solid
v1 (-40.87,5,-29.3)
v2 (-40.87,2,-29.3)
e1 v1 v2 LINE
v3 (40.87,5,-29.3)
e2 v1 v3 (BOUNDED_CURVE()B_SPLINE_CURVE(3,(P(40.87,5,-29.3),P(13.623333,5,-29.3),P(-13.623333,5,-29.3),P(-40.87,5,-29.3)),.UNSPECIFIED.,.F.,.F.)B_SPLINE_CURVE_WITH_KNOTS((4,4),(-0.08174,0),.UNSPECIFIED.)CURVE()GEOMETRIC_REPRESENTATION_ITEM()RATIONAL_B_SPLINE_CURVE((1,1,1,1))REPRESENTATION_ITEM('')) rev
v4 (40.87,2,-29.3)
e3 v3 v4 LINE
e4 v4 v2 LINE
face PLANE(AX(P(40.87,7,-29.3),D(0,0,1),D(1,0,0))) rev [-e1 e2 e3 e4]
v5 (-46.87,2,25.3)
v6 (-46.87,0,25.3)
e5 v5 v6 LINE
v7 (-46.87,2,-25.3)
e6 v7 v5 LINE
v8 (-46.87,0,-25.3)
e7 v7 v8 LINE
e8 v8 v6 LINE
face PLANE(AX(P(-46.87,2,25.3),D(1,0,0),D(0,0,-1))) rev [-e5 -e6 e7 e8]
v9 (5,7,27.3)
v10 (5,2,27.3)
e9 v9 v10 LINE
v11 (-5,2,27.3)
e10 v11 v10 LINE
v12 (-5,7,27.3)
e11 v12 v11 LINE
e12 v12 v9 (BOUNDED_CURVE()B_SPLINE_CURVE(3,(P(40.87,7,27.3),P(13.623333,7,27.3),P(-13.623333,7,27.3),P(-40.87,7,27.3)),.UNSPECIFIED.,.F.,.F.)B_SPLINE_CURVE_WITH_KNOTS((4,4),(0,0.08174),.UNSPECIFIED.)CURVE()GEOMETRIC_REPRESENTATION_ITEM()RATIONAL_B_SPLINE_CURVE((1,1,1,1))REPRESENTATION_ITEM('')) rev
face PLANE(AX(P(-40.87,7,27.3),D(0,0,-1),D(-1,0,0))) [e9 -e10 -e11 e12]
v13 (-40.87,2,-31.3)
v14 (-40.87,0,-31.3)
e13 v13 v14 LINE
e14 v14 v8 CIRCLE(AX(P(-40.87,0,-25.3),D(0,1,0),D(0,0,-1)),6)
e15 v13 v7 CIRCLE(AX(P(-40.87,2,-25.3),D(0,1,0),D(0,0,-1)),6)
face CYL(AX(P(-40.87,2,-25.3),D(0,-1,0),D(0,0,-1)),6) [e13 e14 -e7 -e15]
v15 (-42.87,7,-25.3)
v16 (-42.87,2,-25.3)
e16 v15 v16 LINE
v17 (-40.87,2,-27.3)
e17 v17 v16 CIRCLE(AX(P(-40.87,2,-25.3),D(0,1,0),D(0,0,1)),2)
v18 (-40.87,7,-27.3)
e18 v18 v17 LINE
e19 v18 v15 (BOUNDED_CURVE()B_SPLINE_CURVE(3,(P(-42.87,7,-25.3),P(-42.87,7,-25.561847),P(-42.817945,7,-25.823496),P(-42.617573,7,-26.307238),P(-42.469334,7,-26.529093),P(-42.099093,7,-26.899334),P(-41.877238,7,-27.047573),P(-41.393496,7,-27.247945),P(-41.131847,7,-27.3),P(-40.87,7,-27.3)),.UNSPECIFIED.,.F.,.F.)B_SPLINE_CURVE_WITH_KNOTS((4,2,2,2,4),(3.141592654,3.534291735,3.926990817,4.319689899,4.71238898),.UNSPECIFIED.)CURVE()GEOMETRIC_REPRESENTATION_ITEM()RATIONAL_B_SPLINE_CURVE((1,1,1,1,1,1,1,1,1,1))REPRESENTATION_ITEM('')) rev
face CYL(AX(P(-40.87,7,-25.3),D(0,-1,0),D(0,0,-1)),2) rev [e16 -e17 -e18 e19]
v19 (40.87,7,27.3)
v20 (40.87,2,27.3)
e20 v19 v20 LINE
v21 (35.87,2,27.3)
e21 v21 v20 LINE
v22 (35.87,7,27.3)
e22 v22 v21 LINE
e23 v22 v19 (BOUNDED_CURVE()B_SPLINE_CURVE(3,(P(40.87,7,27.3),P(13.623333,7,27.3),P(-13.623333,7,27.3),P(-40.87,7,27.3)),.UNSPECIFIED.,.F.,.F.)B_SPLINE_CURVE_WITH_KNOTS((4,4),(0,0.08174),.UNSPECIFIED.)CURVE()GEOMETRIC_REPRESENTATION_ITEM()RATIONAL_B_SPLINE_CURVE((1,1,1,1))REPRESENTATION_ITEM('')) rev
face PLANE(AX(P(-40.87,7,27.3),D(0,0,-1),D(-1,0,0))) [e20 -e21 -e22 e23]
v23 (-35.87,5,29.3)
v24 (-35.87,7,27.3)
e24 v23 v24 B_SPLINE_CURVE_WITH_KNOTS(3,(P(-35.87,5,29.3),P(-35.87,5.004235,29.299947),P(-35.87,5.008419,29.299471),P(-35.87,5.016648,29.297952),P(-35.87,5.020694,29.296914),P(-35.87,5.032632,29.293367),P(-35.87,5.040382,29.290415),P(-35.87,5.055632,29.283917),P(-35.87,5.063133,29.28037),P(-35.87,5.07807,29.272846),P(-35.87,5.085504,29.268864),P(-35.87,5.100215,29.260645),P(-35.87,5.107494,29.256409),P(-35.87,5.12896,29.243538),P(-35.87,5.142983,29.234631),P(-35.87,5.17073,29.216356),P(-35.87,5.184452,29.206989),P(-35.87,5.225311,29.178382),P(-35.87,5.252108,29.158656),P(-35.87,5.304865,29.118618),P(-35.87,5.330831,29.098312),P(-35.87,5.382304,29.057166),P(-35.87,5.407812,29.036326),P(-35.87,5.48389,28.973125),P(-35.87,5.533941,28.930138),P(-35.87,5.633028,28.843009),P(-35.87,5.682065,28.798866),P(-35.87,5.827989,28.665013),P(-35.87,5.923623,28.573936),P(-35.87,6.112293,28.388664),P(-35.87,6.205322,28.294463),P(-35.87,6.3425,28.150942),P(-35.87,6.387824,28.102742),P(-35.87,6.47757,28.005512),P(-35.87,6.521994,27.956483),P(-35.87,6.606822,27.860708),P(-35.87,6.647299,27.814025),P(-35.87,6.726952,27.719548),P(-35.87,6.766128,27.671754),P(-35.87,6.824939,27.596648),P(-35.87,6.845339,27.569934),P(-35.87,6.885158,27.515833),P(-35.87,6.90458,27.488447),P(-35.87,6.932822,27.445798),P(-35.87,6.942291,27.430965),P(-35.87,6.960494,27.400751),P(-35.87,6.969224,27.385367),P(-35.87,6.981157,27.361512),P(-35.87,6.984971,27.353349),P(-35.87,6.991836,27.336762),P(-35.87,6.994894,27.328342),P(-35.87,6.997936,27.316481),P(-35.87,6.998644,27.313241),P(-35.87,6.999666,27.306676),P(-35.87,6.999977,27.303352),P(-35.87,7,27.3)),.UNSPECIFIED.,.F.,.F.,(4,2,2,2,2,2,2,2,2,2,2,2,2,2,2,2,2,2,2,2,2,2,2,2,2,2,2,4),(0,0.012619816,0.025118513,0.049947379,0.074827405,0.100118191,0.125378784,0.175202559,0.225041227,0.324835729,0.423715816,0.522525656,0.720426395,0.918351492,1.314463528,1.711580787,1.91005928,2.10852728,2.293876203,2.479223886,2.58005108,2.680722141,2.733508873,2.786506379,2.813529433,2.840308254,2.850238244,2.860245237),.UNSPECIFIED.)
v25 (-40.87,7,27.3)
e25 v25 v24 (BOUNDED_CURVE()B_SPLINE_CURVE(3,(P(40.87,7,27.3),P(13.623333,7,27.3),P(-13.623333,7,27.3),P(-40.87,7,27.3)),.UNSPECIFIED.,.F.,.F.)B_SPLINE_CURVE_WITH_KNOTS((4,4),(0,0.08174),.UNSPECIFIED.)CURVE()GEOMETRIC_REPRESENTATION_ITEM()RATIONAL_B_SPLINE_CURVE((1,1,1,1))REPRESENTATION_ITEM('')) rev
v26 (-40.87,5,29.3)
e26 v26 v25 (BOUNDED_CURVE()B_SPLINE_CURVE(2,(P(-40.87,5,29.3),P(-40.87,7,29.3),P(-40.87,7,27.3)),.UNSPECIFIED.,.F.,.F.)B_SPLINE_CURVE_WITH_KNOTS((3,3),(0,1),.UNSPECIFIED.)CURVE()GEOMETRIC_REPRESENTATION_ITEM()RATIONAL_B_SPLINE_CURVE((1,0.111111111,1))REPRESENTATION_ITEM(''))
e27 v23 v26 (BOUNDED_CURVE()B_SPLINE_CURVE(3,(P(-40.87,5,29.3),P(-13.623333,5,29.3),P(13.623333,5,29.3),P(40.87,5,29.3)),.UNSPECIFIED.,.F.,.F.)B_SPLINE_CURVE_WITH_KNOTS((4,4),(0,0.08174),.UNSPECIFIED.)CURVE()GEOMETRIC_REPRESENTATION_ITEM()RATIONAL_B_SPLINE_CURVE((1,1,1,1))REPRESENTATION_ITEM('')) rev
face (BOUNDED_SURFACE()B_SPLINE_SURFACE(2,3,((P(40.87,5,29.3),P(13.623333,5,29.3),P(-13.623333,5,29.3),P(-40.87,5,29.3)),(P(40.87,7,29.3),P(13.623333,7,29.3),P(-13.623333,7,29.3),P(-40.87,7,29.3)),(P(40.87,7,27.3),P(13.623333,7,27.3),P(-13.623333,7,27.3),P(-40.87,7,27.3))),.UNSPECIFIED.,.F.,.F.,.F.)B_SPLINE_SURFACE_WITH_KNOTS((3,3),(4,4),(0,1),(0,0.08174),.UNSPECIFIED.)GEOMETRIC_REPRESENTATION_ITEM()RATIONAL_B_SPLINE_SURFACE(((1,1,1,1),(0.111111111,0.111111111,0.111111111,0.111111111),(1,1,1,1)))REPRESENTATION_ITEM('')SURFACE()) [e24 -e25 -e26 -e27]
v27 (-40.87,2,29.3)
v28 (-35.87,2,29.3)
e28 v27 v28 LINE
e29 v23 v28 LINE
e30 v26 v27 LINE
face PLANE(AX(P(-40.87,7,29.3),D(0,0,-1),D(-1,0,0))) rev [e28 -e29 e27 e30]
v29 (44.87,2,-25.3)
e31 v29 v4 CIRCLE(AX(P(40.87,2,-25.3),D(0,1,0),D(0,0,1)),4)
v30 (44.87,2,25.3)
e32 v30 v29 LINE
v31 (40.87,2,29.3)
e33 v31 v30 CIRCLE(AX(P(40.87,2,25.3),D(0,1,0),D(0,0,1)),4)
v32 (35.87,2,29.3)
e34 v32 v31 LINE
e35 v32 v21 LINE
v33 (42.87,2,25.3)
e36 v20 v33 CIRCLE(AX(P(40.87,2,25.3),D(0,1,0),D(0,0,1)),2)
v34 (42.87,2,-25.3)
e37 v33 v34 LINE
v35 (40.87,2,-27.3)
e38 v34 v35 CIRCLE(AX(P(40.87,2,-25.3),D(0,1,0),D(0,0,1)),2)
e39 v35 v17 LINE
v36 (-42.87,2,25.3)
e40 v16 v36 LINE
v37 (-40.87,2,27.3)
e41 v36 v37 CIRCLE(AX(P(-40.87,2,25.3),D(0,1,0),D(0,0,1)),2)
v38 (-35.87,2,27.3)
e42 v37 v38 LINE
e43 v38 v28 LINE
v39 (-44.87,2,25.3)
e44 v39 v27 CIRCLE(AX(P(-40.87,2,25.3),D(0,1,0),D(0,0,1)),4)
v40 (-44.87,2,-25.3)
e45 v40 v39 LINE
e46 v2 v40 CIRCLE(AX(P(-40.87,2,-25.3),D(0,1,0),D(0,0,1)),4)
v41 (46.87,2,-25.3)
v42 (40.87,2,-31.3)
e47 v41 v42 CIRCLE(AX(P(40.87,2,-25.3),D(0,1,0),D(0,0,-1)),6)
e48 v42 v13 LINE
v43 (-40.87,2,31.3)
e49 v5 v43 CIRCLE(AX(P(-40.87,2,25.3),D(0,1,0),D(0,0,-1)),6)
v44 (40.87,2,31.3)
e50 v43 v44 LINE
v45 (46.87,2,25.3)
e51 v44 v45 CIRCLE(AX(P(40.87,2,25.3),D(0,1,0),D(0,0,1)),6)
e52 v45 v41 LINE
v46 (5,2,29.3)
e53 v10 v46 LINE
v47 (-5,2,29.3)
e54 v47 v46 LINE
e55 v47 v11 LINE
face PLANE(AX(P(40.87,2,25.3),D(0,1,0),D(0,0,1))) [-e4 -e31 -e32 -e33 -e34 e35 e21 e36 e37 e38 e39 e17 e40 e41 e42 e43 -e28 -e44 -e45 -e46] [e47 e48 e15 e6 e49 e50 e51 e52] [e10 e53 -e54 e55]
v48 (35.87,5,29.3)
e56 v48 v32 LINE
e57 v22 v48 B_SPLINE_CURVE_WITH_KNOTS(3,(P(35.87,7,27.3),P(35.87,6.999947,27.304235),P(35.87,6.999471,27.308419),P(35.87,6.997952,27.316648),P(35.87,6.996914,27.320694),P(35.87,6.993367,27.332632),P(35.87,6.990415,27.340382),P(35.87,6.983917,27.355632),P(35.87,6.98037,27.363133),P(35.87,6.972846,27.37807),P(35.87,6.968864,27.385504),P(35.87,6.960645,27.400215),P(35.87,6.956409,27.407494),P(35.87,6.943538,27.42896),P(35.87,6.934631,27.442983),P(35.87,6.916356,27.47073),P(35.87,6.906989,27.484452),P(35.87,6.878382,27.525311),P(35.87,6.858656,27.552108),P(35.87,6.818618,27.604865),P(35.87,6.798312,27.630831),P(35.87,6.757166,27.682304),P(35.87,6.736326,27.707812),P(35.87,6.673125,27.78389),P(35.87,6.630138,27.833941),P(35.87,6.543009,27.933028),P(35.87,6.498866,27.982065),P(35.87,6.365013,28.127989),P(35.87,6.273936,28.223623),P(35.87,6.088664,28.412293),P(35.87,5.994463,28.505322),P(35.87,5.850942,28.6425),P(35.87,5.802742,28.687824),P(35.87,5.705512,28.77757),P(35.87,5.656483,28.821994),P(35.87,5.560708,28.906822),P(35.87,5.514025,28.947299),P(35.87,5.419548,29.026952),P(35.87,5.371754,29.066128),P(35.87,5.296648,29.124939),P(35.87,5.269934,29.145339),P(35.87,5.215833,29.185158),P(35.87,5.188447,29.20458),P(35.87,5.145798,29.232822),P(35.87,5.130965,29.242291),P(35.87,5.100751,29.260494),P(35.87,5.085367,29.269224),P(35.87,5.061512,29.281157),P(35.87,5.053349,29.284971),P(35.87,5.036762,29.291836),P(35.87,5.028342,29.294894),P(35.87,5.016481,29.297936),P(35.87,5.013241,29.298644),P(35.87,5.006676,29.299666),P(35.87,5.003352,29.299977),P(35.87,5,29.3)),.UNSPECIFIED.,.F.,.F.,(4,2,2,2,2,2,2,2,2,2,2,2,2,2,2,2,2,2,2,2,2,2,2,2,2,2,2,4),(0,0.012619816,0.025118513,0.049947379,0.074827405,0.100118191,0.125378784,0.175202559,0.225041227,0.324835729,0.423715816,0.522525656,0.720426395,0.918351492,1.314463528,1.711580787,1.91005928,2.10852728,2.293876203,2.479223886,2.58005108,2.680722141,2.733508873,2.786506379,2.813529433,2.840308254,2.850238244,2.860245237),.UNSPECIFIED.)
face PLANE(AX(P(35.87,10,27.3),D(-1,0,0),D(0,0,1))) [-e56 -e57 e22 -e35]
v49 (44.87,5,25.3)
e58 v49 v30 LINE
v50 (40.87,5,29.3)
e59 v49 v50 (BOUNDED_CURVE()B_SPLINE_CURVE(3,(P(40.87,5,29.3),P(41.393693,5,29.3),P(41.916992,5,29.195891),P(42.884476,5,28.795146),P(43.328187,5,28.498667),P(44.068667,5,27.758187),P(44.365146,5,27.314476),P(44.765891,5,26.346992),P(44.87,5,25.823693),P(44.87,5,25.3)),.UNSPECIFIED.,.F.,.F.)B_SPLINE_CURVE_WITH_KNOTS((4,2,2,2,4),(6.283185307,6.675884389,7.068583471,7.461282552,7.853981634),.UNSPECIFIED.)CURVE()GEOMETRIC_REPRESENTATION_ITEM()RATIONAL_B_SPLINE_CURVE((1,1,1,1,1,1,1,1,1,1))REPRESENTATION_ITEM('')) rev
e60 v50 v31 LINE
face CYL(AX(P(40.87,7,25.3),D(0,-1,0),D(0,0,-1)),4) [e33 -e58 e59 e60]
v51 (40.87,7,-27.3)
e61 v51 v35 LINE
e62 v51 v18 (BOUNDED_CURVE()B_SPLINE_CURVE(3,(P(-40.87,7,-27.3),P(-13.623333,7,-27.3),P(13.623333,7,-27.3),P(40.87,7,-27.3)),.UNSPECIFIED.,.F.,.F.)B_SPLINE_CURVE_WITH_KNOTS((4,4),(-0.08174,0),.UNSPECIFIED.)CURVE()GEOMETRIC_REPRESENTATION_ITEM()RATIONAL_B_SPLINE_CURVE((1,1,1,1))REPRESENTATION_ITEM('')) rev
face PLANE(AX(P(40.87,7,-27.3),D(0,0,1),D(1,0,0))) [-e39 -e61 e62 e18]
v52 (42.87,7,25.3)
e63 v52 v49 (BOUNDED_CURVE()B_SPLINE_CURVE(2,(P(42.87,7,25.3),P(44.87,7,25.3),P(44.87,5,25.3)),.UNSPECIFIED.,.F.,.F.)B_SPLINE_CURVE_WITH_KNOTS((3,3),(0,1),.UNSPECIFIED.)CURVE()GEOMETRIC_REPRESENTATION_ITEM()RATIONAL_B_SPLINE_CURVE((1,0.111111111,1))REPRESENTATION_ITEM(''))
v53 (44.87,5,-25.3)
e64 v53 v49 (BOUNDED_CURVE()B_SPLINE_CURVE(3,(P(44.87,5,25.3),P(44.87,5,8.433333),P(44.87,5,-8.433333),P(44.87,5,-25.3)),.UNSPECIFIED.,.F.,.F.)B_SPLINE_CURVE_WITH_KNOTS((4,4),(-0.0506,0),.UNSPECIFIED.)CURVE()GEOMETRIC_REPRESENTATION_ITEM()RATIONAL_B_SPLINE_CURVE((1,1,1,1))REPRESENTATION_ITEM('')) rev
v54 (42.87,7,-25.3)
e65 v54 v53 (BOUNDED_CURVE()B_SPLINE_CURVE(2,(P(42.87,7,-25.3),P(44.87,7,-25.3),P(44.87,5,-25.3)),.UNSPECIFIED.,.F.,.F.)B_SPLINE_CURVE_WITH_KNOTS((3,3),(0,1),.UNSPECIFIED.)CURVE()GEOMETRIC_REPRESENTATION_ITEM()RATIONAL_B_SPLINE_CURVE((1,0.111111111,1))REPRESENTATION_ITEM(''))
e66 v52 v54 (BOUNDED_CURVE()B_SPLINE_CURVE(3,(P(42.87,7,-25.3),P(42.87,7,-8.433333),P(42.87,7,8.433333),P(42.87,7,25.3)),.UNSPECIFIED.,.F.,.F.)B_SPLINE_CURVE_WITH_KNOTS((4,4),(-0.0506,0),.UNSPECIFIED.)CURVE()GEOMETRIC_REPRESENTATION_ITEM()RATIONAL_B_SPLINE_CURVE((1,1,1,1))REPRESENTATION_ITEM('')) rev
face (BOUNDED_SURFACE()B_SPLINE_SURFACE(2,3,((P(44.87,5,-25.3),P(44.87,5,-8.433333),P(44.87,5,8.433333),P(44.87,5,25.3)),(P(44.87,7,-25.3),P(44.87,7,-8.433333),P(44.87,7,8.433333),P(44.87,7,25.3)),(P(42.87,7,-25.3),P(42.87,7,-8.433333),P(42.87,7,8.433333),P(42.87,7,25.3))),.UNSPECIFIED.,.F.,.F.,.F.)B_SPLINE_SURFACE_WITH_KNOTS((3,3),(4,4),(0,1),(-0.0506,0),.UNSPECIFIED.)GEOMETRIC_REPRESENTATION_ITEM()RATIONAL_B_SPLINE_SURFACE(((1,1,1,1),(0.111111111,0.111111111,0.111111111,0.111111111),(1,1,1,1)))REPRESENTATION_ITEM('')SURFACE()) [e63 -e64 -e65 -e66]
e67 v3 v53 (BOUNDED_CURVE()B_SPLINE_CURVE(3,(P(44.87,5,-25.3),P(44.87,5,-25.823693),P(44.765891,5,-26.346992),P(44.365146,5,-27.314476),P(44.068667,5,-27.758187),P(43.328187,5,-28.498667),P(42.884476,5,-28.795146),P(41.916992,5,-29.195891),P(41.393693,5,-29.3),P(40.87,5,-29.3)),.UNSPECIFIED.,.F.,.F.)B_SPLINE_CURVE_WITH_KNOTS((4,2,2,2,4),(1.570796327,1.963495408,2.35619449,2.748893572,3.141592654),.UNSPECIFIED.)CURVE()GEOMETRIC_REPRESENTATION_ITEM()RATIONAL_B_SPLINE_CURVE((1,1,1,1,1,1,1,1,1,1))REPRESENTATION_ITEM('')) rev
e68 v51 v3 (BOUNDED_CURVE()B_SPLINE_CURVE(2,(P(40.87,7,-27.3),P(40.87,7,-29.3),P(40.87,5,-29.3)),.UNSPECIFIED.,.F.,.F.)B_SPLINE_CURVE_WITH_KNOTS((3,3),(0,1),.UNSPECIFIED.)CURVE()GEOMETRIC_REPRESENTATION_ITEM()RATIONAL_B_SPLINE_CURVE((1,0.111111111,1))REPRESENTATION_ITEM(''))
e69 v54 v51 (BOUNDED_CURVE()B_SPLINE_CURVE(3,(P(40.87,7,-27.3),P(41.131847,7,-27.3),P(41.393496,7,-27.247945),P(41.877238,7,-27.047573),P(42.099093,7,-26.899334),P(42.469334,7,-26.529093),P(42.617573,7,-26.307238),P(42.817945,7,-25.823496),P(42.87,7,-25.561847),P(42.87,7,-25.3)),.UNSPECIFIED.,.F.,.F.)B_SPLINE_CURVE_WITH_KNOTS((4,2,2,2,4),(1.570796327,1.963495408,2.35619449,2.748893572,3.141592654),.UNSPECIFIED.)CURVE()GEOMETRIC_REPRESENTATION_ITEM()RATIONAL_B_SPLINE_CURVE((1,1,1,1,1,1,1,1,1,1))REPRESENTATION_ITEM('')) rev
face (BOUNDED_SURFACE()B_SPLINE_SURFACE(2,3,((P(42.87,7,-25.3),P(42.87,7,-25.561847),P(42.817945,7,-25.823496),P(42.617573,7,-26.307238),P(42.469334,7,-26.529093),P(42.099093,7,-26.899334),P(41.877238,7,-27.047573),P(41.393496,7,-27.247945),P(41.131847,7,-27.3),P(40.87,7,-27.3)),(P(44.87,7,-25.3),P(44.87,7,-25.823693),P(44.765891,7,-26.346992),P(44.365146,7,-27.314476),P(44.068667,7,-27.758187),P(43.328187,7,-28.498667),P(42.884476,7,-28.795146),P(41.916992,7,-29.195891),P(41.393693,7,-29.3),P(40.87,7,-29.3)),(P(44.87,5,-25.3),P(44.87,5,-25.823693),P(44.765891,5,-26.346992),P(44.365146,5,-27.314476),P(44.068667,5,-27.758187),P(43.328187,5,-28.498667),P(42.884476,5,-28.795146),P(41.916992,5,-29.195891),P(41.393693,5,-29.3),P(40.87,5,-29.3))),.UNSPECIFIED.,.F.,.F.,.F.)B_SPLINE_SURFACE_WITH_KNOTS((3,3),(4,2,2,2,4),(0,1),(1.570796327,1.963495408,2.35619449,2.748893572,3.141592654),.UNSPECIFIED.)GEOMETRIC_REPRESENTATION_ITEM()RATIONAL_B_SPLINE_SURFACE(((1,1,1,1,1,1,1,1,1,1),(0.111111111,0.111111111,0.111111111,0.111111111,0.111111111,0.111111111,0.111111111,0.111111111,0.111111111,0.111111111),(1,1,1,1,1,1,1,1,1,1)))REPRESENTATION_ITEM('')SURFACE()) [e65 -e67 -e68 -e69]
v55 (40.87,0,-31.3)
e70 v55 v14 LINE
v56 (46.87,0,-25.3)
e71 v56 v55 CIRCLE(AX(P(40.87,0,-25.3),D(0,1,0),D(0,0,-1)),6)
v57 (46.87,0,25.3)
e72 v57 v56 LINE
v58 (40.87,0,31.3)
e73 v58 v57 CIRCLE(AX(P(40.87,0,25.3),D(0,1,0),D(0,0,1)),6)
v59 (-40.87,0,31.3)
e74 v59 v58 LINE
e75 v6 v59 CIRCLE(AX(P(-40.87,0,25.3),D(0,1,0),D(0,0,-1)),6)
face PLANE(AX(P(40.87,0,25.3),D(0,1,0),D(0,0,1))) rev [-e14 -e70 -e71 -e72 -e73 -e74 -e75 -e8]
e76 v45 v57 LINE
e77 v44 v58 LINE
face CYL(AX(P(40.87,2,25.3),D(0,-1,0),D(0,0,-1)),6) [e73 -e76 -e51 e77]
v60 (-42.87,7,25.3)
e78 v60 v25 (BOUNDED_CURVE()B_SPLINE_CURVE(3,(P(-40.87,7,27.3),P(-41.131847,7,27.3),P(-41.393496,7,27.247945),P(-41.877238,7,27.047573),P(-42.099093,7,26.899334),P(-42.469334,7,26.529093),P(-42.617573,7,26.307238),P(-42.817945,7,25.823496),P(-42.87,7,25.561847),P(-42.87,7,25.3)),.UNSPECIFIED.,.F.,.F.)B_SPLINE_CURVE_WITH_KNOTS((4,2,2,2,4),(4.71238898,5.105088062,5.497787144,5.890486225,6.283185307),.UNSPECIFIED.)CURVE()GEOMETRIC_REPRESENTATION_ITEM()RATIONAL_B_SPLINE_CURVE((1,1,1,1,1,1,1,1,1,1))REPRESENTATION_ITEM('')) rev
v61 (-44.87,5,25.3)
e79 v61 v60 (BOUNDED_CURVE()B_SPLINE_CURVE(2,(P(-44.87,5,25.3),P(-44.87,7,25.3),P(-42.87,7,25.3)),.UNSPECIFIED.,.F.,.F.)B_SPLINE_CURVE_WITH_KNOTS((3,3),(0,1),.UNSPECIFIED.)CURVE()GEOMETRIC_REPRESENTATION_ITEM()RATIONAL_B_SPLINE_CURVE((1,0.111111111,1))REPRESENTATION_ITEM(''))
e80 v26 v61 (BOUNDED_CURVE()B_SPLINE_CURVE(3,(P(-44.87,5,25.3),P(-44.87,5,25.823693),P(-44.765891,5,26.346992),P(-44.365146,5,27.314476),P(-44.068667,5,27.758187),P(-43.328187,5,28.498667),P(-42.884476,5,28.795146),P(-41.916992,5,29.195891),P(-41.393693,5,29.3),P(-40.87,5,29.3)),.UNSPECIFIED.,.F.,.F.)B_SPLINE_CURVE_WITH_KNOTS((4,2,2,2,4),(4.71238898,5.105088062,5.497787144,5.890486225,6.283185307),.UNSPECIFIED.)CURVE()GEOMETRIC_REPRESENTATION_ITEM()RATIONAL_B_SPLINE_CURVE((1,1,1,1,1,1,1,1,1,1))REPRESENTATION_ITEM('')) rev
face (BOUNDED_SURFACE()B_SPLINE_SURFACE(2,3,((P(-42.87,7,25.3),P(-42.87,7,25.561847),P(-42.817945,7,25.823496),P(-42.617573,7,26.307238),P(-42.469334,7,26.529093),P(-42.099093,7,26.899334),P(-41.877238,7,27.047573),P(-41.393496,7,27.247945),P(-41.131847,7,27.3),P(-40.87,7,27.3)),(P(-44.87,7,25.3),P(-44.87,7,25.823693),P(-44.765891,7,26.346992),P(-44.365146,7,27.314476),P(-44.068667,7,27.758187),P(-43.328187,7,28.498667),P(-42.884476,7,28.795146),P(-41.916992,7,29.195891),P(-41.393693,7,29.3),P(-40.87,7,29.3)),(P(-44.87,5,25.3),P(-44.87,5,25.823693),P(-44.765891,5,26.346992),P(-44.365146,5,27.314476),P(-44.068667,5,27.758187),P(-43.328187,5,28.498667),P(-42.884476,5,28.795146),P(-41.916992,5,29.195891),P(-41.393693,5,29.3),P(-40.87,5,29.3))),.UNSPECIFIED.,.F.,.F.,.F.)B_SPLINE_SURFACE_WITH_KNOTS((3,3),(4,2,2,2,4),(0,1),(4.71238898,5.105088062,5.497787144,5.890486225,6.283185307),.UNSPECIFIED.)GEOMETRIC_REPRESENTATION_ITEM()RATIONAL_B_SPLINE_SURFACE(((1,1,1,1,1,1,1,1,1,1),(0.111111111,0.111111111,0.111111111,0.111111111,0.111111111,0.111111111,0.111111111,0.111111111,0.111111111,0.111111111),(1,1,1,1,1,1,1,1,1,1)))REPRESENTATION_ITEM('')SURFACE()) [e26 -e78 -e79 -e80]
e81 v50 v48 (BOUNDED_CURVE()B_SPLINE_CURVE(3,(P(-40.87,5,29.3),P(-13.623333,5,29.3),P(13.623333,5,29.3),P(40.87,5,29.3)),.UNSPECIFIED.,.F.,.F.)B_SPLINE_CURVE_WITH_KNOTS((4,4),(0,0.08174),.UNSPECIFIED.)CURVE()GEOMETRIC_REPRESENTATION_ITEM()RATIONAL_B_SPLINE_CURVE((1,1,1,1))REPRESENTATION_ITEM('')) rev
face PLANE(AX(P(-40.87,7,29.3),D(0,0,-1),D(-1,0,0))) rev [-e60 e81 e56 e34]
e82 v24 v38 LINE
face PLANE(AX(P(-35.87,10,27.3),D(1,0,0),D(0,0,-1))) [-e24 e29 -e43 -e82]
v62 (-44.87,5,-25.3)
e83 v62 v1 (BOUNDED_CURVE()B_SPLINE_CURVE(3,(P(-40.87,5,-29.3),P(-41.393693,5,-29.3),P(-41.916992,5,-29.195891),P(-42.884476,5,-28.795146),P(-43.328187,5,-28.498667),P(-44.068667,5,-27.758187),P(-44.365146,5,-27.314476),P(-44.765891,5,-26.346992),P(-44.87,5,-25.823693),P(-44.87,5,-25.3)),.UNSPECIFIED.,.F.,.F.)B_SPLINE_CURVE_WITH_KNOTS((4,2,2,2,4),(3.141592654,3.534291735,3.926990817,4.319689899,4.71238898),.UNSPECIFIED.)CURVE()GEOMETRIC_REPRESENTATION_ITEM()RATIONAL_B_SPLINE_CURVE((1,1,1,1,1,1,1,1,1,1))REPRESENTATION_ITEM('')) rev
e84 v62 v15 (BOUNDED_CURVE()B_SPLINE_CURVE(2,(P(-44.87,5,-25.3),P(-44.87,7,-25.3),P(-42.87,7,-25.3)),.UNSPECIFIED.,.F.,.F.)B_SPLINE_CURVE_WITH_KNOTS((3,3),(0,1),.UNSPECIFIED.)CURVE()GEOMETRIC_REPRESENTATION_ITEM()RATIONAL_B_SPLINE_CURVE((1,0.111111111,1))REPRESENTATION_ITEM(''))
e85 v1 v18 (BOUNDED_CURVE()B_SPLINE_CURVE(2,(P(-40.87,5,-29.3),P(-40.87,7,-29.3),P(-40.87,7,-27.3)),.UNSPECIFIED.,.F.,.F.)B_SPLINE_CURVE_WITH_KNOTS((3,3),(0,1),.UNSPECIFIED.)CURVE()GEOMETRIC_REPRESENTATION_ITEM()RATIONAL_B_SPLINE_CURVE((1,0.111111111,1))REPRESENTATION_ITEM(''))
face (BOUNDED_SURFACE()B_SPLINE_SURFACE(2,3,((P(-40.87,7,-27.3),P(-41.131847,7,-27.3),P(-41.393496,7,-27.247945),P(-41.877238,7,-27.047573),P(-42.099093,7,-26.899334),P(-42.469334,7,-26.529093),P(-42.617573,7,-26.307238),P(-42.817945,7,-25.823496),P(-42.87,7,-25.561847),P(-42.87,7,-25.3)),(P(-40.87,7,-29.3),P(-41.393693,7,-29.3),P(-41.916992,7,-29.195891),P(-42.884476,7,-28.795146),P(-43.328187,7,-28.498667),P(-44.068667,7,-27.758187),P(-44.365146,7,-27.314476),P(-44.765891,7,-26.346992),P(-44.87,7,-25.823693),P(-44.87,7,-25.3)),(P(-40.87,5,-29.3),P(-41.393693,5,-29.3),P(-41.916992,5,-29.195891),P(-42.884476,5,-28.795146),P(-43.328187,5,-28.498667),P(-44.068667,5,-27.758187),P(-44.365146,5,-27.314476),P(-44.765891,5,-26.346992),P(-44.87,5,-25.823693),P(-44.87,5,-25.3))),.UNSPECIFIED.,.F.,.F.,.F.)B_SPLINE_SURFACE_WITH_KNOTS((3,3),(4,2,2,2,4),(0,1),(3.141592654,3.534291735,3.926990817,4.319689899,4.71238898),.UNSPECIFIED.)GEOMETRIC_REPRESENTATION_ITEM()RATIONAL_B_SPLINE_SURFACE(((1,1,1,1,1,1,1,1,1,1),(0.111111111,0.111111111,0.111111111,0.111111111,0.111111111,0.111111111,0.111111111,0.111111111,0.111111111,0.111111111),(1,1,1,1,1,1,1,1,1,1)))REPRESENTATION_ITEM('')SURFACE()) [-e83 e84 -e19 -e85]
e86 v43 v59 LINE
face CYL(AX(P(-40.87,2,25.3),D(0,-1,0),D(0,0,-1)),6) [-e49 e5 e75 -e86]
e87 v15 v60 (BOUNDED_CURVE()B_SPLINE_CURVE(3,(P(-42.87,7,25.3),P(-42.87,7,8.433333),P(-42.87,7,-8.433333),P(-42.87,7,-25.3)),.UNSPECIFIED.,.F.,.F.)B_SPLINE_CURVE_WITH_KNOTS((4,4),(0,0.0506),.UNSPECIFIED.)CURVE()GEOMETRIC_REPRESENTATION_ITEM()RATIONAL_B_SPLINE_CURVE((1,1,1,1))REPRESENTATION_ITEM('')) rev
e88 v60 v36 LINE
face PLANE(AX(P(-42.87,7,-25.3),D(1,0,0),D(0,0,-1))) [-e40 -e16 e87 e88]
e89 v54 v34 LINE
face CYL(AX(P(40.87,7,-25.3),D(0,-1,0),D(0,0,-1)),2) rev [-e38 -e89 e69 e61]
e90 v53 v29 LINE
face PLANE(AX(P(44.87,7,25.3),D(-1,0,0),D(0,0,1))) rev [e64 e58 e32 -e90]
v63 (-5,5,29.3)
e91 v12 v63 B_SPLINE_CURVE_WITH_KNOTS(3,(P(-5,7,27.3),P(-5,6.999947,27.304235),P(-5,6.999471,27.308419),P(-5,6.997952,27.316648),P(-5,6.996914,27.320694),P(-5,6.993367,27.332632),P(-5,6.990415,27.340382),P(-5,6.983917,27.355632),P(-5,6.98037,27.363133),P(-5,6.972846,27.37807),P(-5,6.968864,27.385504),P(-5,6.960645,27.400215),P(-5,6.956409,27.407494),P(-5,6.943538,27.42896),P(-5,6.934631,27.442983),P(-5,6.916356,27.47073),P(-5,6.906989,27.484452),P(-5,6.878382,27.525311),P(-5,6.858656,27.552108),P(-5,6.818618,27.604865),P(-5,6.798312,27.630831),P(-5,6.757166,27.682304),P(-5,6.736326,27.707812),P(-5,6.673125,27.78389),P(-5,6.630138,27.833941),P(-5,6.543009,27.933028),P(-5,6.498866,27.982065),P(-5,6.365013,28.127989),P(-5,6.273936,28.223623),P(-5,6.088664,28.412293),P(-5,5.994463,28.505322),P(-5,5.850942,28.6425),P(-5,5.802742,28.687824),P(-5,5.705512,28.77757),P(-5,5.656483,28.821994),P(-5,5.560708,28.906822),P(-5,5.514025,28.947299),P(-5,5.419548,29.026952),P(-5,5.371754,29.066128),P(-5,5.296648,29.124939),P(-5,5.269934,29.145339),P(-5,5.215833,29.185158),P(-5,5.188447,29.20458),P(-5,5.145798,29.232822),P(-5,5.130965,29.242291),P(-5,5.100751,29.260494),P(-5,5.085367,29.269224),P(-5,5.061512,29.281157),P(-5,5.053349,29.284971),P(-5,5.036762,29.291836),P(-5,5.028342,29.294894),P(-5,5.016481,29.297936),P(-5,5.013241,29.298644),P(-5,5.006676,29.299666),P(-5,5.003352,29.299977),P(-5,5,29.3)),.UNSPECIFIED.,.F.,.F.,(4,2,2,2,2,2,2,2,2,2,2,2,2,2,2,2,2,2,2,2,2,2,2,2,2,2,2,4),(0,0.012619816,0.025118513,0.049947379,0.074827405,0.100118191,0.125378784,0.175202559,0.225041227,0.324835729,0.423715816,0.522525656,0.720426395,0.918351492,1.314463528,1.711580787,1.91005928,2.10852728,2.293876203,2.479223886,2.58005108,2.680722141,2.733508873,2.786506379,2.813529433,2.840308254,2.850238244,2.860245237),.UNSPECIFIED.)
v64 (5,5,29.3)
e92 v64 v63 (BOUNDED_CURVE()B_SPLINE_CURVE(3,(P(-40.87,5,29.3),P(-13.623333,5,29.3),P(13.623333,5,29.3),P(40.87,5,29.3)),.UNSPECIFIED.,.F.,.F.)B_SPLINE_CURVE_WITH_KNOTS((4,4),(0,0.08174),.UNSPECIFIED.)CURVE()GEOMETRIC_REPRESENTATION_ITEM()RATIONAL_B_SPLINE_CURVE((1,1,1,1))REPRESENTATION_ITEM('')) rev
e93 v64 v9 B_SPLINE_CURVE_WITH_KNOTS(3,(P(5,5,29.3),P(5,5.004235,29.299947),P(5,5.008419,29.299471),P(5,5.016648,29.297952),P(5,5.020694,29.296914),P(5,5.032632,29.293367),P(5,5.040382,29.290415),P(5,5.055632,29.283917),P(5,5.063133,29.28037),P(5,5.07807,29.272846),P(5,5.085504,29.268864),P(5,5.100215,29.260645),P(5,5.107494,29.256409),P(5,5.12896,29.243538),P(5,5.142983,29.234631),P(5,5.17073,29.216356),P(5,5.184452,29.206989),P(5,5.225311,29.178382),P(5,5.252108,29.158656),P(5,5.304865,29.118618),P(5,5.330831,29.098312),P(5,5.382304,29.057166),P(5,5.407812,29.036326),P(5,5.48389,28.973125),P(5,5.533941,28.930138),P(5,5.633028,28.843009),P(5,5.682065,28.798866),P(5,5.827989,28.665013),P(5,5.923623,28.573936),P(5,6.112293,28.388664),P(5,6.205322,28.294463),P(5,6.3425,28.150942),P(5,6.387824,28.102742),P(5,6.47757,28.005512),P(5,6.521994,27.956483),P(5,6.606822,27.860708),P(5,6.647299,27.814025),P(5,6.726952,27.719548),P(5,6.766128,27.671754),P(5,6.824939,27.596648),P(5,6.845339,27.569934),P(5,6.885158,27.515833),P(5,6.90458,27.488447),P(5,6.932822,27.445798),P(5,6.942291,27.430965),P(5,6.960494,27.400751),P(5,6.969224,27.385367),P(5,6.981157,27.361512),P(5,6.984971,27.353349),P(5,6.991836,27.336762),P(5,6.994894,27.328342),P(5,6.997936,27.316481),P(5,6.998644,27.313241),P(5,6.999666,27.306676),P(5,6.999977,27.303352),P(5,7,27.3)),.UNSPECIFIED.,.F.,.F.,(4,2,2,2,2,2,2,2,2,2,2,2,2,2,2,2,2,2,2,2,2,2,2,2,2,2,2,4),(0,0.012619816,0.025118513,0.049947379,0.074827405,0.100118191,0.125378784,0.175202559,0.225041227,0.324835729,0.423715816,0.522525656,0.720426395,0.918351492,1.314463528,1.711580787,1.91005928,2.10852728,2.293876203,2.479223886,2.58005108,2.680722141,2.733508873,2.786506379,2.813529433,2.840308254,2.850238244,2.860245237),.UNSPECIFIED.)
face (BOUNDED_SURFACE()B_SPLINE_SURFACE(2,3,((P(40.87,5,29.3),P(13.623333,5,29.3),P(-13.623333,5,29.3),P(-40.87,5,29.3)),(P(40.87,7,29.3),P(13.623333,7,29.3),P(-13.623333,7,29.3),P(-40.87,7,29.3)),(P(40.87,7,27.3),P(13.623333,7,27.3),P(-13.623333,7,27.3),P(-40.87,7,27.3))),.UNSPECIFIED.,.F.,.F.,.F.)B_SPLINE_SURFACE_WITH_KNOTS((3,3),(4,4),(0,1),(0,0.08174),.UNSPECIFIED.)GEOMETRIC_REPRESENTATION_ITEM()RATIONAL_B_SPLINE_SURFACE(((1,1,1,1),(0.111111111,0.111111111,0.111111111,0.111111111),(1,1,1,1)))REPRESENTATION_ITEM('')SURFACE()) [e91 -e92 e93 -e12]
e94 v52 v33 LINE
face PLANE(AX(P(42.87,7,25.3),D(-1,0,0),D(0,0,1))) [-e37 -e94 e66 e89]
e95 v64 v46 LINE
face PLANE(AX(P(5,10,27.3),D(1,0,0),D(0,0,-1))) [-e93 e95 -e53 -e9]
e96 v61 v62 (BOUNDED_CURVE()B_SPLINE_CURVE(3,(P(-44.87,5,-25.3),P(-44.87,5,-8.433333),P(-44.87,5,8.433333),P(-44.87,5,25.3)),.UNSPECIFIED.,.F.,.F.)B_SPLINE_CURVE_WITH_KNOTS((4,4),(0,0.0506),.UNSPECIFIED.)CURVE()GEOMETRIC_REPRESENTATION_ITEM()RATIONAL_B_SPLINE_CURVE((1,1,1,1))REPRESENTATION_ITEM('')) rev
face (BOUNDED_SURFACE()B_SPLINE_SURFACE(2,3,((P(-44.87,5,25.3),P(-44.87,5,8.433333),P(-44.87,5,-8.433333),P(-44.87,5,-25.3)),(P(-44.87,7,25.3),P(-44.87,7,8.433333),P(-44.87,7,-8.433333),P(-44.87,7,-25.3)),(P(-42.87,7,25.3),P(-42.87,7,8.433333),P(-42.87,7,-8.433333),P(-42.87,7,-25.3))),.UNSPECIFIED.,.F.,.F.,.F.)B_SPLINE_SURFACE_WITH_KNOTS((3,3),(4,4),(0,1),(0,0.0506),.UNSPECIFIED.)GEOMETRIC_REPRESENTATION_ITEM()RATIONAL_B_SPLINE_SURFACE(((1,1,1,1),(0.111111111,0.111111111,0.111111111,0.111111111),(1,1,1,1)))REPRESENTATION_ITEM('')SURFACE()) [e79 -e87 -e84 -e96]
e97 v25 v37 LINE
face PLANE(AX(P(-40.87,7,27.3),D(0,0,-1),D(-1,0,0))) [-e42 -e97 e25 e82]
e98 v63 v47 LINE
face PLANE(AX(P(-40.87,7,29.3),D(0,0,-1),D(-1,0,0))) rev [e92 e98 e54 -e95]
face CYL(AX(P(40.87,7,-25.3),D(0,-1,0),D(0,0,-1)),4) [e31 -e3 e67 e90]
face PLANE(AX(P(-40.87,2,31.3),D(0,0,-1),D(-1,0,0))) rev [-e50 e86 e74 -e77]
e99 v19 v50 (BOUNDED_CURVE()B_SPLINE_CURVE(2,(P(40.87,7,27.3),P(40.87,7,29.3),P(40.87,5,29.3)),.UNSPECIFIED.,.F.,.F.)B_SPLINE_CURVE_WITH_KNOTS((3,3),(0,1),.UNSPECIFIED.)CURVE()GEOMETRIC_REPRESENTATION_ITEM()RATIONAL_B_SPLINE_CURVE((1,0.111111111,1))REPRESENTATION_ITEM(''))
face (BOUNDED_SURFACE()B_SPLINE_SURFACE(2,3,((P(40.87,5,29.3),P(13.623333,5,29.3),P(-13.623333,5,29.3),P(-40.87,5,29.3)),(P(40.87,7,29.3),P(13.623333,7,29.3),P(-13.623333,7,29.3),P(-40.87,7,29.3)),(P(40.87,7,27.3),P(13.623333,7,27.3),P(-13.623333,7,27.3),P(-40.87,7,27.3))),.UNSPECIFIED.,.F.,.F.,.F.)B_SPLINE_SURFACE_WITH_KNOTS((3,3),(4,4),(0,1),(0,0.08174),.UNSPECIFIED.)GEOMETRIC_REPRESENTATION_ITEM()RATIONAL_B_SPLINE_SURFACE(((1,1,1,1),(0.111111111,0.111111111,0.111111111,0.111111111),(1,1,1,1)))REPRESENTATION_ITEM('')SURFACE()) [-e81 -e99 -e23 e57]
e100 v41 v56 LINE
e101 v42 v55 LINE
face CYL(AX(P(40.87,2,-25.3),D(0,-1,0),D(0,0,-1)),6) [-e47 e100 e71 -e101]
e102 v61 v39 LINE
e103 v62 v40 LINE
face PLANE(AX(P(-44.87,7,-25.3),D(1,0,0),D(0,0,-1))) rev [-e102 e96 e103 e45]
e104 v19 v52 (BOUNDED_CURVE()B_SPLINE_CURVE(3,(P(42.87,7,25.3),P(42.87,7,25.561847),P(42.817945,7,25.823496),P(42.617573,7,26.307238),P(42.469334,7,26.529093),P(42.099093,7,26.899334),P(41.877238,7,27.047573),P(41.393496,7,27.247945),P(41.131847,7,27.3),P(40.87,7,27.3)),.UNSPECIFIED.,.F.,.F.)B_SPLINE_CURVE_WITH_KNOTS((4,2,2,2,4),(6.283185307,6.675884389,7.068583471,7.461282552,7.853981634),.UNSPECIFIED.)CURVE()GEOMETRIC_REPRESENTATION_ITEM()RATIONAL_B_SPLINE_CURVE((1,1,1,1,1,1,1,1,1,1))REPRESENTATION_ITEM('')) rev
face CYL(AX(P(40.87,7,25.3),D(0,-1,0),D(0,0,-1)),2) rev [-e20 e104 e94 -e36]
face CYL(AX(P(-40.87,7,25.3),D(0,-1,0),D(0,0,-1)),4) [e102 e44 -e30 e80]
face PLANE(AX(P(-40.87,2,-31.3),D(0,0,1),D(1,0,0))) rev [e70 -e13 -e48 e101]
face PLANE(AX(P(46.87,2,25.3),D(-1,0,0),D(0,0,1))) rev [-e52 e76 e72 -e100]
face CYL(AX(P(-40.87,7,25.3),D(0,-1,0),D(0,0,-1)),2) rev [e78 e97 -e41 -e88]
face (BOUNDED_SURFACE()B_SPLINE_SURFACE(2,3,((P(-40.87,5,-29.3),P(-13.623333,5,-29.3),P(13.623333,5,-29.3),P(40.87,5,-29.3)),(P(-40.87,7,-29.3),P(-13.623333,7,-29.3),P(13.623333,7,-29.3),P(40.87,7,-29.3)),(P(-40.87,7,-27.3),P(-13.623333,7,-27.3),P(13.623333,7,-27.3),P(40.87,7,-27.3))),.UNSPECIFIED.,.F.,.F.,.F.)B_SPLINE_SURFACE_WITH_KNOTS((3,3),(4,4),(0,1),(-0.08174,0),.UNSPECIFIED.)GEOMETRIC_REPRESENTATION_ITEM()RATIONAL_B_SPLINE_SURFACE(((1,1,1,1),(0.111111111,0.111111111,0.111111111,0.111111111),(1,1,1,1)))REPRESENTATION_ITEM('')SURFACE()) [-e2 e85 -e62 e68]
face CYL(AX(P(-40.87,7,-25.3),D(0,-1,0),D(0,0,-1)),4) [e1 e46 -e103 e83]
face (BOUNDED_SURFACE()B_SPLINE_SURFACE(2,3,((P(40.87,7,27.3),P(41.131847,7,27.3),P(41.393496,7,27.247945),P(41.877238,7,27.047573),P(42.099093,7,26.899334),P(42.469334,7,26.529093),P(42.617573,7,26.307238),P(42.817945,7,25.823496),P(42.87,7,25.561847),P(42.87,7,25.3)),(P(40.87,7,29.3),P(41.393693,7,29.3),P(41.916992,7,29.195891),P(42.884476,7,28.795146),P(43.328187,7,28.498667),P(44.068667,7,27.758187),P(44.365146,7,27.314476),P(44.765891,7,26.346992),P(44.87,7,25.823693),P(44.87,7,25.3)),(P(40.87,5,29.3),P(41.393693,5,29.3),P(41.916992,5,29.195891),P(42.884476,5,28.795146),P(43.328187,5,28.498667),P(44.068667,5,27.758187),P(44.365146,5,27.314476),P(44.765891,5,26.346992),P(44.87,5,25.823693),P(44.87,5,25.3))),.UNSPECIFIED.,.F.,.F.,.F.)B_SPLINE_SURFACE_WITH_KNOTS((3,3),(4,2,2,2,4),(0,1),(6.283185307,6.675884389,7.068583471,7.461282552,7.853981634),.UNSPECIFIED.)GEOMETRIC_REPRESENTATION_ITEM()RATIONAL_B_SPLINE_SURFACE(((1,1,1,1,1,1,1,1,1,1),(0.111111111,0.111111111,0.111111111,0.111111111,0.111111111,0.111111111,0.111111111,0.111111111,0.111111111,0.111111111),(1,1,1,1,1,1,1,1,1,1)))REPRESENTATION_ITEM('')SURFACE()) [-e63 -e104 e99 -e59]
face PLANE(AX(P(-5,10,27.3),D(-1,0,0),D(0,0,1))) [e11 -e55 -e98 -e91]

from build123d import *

# Parameters (mm, degrees)
SALIENTE_EXTRUIR1_DEPTH = 2
SALIENTE_EXTRUIR2_DEPTH = 5
REDONDEO1_SIZE          = 2
CROQUIS3_W              = 30.87
CROQUIS3_H              = 2
CORTAR_EXTRUIR1_DEPTH   = 8


with BuildPart() as part:
    # Croquis1 → Saliente-Extruir1 (new body)
    with BuildSketch(Plane(origin=(0, 0, 0), x_dir=(1, 0, 0), z_dir=(0, 1, 0))):
        with BuildLine():
            Line((-40.87, -31.3), (40.87, -31.3))
            ThreePointArc((40.87, -31.3), (45.112640687, -29.542640687), (46.87, -25.3))
            Line((46.87, -25.3), (46.87, 25.3))
            ThreePointArc((46.87, 25.3), (45.112640687, 29.542640687), (40.87, 31.3))
            Line((40.87, 31.3), (-40.87, 31.3))
            ThreePointArc((-40.87, 31.3), (-45.112640687, 29.542640687), (-46.87, 25.3))
            Line((-46.87, 25.3), (-46.87, -25.3))
            ThreePointArc((-46.87, -25.3), (-45.112640687, -29.542640687), (-40.87, -31.3))
        make_face()
    extrude(amount=SALIENTE_EXTRUIR1_DEPTH)

    # Croquis2 → Saliente-Extruir2 (add)
    with BuildSketch(Plane(origin=(0, 2, 0), x_dir=(1, 0, 0), z_dir=(0, 1, 0))):
        with BuildLine():
            Line((44.87, -25.3), (44.87, 25.3))
            ThreePointArc((44.87, 25.3), (43.698427125, 28.128427125), (40.87, 29.3))
            Line((40.87, 29.3), (-40.87, 29.3))
            ThreePointArc((-40.87, 29.3), (-43.698427125, 28.128427125), (-44.87, 25.3))
            Line((-44.87, 25.3), (-44.87, -25.3))
            ThreePointArc((-44.87, -25.3), (-43.698427125, -28.128427125), (-40.87, -29.3))
            Line((-40.87, -29.3), (40.87, -29.3))
            ThreePointArc((40.87, -29.3), (43.698427125, -28.128427125), (44.87, -25.3))
        make_face()
        with BuildLine():
            Line((42.87, -25.3), (42.87, 25.3))
            ThreePointArc((42.87, 25.3), (42.284213562, 26.714213562), (40.87, 27.3))
            Line((40.87, 27.3), (-40.87, 27.3))
            ThreePointArc((-40.87, 27.3), (-42.284213562, 26.714213562), (-42.87, 25.3))
            Line((-42.87, 25.3), (-42.87, -25.3))
            ThreePointArc((-42.87, -25.3), (-42.284213562, -26.714213562), (-40.87, -27.3))
            Line((-40.87, -27.3), (40.87, -27.3))
            ThreePointArc((40.87, -27.3), (42.284213562, -26.714213562), (42.87, -25.3))
        make_face(mode=Mode.SUBTRACT)
    extrude(amount=SALIENTE_EXTRUIR2_DEPTH)

    # Redondeo1
    # a fillet whose section is not a circle: 2 mm, written as the material it takes off along each edge
    with BuildSketch(Plane(origin=(40.87, 7, -29.3), x_dir=(0, -1, 0), z_dir=(-1, 0, 0)), Plane(origin=(-40.87, 7, 29.3), x_dir=(0, -1, 0), z_dir=(1, 0, 0))) as redondeo1_piece_1:
        with BuildLine():
            Bezier((REDONDEO1_SIZE, 0), (0, 0), (0, REDONDEO1_SIZE), weights=[1, 0.111111111, 1])
            Line((0, REDONDEO1_SIZE), (0, 0))
            Line((0, 0), (REDONDEO1_SIZE, 0))
        make_face()
    extrude(amount=81.74, mode=Mode.SUBTRACT)
    with BuildSketch(Plane(origin=(-40.87, 7, -25.3), x_dir=(0, 0, -1), z_dir=(1, 0, 0))) as redondeo1_piece_2:
        with BuildLine():
            Bezier((4, -REDONDEO1_SIZE), (4, 0), (4 - REDONDEO1_SIZE, 0), weights=[1, 0.111111111, 1])
            Line((4 - REDONDEO1_SIZE, 0), (4, 0))
            Line((4, 0), (4, -REDONDEO1_SIZE))
        make_face()
    revolve(axis=Axis((-40.87, 7, -25.3), (0, 1, 0)), revolution_arc=90, mode=Mode.SUBTRACT)
    with BuildSketch(Plane(origin=(40.87, 7, -25.3), x_dir=(1, 0, 0), z_dir=(0, 0, 1))) as redondeo1_piece_3:
        with BuildLine():
            Bezier((4, -REDONDEO1_SIZE), (4, 0), (4 - REDONDEO1_SIZE, 0), weights=[1, 0.111111111, 1])
            Line((4 - REDONDEO1_SIZE, 0), (4, 0))
            Line((4, 0), (4, -REDONDEO1_SIZE))
        make_face()
    revolve(axis=Axis((40.87, 7, -25.3), (0, 1, 0)), revolution_arc=90, mode=Mode.SUBTRACT)
    with BuildSketch(Plane(origin=(-44.87, 7, -25.3), x_dir=(0, -1, 0), z_dir=(0, 0, 1)), Plane(origin=(44.87, 7, 25.3), x_dir=(0, -1, 0), z_dir=(0, 0, -1))) as redondeo1_piece_4:
        with BuildLine():
            Bezier((REDONDEO1_SIZE, 0), (0, 0), (0, REDONDEO1_SIZE), weights=[1, 0.111111111, 1])
            Line((0, REDONDEO1_SIZE), (0, 0))
            Line((0, 0), (REDONDEO1_SIZE, 0))
        make_face()
    extrude(amount=50.6, mode=Mode.SUBTRACT)
    with BuildSketch(Plane(origin=(-40.87, 7, 25.3), x_dir=(-1, 0, 0), z_dir=(0, 0, -1))) as redondeo1_piece_5:
        with BuildLine():
            Bezier((4, -REDONDEO1_SIZE), (4, 0), (4 - REDONDEO1_SIZE, 0), weights=[1, 0.111111111, 1])
            Line((4 - REDONDEO1_SIZE, 0), (4, 0))
            Line((4, 0), (4, -REDONDEO1_SIZE))
        make_face()
    revolve(axis=Axis((-40.87, 7, 25.3), (0, 1, 0)), revolution_arc=90, mode=Mode.SUBTRACT)
    with BuildSketch(Plane(origin=(40.87, 7, 25.3), x_dir=(0, 0, 1), z_dir=(-1, 0, 0))) as redondeo1_piece_6:
        with BuildLine():
            Bezier((4, -REDONDEO1_SIZE), (4, 0), (4 - REDONDEO1_SIZE, 0), weights=[1, 0.111111111, 1])
            Line((4 - REDONDEO1_SIZE, 0), (4, 0))
            Line((4, 0), (4, -REDONDEO1_SIZE))
        make_face()
    revolve(axis=Axis((40.87, 7, 25.3), (0, 1, 0)), revolution_arc=90, mode=Mode.SUBTRACT)

    # Croquis3 → Cortar-Extruir1 (cut)
    with BuildSketch(Plane(origin=(0, 2, 0), x_dir=(1, 0, 0), z_dir=(0, 1, 0))):
        with Locations((-20.435, -28.3)):
            Rectangle(CROQUIS3_W, CROQUIS3_H)
        with Locations((20.435, -28.3)):
            Rectangle(CROQUIS3_W, CROQUIS3_H)
    extrude(amount=CORTAR_EXTRUIR1_DEPTH, mode=Mode.SUBTRACT)


solid = part.part
